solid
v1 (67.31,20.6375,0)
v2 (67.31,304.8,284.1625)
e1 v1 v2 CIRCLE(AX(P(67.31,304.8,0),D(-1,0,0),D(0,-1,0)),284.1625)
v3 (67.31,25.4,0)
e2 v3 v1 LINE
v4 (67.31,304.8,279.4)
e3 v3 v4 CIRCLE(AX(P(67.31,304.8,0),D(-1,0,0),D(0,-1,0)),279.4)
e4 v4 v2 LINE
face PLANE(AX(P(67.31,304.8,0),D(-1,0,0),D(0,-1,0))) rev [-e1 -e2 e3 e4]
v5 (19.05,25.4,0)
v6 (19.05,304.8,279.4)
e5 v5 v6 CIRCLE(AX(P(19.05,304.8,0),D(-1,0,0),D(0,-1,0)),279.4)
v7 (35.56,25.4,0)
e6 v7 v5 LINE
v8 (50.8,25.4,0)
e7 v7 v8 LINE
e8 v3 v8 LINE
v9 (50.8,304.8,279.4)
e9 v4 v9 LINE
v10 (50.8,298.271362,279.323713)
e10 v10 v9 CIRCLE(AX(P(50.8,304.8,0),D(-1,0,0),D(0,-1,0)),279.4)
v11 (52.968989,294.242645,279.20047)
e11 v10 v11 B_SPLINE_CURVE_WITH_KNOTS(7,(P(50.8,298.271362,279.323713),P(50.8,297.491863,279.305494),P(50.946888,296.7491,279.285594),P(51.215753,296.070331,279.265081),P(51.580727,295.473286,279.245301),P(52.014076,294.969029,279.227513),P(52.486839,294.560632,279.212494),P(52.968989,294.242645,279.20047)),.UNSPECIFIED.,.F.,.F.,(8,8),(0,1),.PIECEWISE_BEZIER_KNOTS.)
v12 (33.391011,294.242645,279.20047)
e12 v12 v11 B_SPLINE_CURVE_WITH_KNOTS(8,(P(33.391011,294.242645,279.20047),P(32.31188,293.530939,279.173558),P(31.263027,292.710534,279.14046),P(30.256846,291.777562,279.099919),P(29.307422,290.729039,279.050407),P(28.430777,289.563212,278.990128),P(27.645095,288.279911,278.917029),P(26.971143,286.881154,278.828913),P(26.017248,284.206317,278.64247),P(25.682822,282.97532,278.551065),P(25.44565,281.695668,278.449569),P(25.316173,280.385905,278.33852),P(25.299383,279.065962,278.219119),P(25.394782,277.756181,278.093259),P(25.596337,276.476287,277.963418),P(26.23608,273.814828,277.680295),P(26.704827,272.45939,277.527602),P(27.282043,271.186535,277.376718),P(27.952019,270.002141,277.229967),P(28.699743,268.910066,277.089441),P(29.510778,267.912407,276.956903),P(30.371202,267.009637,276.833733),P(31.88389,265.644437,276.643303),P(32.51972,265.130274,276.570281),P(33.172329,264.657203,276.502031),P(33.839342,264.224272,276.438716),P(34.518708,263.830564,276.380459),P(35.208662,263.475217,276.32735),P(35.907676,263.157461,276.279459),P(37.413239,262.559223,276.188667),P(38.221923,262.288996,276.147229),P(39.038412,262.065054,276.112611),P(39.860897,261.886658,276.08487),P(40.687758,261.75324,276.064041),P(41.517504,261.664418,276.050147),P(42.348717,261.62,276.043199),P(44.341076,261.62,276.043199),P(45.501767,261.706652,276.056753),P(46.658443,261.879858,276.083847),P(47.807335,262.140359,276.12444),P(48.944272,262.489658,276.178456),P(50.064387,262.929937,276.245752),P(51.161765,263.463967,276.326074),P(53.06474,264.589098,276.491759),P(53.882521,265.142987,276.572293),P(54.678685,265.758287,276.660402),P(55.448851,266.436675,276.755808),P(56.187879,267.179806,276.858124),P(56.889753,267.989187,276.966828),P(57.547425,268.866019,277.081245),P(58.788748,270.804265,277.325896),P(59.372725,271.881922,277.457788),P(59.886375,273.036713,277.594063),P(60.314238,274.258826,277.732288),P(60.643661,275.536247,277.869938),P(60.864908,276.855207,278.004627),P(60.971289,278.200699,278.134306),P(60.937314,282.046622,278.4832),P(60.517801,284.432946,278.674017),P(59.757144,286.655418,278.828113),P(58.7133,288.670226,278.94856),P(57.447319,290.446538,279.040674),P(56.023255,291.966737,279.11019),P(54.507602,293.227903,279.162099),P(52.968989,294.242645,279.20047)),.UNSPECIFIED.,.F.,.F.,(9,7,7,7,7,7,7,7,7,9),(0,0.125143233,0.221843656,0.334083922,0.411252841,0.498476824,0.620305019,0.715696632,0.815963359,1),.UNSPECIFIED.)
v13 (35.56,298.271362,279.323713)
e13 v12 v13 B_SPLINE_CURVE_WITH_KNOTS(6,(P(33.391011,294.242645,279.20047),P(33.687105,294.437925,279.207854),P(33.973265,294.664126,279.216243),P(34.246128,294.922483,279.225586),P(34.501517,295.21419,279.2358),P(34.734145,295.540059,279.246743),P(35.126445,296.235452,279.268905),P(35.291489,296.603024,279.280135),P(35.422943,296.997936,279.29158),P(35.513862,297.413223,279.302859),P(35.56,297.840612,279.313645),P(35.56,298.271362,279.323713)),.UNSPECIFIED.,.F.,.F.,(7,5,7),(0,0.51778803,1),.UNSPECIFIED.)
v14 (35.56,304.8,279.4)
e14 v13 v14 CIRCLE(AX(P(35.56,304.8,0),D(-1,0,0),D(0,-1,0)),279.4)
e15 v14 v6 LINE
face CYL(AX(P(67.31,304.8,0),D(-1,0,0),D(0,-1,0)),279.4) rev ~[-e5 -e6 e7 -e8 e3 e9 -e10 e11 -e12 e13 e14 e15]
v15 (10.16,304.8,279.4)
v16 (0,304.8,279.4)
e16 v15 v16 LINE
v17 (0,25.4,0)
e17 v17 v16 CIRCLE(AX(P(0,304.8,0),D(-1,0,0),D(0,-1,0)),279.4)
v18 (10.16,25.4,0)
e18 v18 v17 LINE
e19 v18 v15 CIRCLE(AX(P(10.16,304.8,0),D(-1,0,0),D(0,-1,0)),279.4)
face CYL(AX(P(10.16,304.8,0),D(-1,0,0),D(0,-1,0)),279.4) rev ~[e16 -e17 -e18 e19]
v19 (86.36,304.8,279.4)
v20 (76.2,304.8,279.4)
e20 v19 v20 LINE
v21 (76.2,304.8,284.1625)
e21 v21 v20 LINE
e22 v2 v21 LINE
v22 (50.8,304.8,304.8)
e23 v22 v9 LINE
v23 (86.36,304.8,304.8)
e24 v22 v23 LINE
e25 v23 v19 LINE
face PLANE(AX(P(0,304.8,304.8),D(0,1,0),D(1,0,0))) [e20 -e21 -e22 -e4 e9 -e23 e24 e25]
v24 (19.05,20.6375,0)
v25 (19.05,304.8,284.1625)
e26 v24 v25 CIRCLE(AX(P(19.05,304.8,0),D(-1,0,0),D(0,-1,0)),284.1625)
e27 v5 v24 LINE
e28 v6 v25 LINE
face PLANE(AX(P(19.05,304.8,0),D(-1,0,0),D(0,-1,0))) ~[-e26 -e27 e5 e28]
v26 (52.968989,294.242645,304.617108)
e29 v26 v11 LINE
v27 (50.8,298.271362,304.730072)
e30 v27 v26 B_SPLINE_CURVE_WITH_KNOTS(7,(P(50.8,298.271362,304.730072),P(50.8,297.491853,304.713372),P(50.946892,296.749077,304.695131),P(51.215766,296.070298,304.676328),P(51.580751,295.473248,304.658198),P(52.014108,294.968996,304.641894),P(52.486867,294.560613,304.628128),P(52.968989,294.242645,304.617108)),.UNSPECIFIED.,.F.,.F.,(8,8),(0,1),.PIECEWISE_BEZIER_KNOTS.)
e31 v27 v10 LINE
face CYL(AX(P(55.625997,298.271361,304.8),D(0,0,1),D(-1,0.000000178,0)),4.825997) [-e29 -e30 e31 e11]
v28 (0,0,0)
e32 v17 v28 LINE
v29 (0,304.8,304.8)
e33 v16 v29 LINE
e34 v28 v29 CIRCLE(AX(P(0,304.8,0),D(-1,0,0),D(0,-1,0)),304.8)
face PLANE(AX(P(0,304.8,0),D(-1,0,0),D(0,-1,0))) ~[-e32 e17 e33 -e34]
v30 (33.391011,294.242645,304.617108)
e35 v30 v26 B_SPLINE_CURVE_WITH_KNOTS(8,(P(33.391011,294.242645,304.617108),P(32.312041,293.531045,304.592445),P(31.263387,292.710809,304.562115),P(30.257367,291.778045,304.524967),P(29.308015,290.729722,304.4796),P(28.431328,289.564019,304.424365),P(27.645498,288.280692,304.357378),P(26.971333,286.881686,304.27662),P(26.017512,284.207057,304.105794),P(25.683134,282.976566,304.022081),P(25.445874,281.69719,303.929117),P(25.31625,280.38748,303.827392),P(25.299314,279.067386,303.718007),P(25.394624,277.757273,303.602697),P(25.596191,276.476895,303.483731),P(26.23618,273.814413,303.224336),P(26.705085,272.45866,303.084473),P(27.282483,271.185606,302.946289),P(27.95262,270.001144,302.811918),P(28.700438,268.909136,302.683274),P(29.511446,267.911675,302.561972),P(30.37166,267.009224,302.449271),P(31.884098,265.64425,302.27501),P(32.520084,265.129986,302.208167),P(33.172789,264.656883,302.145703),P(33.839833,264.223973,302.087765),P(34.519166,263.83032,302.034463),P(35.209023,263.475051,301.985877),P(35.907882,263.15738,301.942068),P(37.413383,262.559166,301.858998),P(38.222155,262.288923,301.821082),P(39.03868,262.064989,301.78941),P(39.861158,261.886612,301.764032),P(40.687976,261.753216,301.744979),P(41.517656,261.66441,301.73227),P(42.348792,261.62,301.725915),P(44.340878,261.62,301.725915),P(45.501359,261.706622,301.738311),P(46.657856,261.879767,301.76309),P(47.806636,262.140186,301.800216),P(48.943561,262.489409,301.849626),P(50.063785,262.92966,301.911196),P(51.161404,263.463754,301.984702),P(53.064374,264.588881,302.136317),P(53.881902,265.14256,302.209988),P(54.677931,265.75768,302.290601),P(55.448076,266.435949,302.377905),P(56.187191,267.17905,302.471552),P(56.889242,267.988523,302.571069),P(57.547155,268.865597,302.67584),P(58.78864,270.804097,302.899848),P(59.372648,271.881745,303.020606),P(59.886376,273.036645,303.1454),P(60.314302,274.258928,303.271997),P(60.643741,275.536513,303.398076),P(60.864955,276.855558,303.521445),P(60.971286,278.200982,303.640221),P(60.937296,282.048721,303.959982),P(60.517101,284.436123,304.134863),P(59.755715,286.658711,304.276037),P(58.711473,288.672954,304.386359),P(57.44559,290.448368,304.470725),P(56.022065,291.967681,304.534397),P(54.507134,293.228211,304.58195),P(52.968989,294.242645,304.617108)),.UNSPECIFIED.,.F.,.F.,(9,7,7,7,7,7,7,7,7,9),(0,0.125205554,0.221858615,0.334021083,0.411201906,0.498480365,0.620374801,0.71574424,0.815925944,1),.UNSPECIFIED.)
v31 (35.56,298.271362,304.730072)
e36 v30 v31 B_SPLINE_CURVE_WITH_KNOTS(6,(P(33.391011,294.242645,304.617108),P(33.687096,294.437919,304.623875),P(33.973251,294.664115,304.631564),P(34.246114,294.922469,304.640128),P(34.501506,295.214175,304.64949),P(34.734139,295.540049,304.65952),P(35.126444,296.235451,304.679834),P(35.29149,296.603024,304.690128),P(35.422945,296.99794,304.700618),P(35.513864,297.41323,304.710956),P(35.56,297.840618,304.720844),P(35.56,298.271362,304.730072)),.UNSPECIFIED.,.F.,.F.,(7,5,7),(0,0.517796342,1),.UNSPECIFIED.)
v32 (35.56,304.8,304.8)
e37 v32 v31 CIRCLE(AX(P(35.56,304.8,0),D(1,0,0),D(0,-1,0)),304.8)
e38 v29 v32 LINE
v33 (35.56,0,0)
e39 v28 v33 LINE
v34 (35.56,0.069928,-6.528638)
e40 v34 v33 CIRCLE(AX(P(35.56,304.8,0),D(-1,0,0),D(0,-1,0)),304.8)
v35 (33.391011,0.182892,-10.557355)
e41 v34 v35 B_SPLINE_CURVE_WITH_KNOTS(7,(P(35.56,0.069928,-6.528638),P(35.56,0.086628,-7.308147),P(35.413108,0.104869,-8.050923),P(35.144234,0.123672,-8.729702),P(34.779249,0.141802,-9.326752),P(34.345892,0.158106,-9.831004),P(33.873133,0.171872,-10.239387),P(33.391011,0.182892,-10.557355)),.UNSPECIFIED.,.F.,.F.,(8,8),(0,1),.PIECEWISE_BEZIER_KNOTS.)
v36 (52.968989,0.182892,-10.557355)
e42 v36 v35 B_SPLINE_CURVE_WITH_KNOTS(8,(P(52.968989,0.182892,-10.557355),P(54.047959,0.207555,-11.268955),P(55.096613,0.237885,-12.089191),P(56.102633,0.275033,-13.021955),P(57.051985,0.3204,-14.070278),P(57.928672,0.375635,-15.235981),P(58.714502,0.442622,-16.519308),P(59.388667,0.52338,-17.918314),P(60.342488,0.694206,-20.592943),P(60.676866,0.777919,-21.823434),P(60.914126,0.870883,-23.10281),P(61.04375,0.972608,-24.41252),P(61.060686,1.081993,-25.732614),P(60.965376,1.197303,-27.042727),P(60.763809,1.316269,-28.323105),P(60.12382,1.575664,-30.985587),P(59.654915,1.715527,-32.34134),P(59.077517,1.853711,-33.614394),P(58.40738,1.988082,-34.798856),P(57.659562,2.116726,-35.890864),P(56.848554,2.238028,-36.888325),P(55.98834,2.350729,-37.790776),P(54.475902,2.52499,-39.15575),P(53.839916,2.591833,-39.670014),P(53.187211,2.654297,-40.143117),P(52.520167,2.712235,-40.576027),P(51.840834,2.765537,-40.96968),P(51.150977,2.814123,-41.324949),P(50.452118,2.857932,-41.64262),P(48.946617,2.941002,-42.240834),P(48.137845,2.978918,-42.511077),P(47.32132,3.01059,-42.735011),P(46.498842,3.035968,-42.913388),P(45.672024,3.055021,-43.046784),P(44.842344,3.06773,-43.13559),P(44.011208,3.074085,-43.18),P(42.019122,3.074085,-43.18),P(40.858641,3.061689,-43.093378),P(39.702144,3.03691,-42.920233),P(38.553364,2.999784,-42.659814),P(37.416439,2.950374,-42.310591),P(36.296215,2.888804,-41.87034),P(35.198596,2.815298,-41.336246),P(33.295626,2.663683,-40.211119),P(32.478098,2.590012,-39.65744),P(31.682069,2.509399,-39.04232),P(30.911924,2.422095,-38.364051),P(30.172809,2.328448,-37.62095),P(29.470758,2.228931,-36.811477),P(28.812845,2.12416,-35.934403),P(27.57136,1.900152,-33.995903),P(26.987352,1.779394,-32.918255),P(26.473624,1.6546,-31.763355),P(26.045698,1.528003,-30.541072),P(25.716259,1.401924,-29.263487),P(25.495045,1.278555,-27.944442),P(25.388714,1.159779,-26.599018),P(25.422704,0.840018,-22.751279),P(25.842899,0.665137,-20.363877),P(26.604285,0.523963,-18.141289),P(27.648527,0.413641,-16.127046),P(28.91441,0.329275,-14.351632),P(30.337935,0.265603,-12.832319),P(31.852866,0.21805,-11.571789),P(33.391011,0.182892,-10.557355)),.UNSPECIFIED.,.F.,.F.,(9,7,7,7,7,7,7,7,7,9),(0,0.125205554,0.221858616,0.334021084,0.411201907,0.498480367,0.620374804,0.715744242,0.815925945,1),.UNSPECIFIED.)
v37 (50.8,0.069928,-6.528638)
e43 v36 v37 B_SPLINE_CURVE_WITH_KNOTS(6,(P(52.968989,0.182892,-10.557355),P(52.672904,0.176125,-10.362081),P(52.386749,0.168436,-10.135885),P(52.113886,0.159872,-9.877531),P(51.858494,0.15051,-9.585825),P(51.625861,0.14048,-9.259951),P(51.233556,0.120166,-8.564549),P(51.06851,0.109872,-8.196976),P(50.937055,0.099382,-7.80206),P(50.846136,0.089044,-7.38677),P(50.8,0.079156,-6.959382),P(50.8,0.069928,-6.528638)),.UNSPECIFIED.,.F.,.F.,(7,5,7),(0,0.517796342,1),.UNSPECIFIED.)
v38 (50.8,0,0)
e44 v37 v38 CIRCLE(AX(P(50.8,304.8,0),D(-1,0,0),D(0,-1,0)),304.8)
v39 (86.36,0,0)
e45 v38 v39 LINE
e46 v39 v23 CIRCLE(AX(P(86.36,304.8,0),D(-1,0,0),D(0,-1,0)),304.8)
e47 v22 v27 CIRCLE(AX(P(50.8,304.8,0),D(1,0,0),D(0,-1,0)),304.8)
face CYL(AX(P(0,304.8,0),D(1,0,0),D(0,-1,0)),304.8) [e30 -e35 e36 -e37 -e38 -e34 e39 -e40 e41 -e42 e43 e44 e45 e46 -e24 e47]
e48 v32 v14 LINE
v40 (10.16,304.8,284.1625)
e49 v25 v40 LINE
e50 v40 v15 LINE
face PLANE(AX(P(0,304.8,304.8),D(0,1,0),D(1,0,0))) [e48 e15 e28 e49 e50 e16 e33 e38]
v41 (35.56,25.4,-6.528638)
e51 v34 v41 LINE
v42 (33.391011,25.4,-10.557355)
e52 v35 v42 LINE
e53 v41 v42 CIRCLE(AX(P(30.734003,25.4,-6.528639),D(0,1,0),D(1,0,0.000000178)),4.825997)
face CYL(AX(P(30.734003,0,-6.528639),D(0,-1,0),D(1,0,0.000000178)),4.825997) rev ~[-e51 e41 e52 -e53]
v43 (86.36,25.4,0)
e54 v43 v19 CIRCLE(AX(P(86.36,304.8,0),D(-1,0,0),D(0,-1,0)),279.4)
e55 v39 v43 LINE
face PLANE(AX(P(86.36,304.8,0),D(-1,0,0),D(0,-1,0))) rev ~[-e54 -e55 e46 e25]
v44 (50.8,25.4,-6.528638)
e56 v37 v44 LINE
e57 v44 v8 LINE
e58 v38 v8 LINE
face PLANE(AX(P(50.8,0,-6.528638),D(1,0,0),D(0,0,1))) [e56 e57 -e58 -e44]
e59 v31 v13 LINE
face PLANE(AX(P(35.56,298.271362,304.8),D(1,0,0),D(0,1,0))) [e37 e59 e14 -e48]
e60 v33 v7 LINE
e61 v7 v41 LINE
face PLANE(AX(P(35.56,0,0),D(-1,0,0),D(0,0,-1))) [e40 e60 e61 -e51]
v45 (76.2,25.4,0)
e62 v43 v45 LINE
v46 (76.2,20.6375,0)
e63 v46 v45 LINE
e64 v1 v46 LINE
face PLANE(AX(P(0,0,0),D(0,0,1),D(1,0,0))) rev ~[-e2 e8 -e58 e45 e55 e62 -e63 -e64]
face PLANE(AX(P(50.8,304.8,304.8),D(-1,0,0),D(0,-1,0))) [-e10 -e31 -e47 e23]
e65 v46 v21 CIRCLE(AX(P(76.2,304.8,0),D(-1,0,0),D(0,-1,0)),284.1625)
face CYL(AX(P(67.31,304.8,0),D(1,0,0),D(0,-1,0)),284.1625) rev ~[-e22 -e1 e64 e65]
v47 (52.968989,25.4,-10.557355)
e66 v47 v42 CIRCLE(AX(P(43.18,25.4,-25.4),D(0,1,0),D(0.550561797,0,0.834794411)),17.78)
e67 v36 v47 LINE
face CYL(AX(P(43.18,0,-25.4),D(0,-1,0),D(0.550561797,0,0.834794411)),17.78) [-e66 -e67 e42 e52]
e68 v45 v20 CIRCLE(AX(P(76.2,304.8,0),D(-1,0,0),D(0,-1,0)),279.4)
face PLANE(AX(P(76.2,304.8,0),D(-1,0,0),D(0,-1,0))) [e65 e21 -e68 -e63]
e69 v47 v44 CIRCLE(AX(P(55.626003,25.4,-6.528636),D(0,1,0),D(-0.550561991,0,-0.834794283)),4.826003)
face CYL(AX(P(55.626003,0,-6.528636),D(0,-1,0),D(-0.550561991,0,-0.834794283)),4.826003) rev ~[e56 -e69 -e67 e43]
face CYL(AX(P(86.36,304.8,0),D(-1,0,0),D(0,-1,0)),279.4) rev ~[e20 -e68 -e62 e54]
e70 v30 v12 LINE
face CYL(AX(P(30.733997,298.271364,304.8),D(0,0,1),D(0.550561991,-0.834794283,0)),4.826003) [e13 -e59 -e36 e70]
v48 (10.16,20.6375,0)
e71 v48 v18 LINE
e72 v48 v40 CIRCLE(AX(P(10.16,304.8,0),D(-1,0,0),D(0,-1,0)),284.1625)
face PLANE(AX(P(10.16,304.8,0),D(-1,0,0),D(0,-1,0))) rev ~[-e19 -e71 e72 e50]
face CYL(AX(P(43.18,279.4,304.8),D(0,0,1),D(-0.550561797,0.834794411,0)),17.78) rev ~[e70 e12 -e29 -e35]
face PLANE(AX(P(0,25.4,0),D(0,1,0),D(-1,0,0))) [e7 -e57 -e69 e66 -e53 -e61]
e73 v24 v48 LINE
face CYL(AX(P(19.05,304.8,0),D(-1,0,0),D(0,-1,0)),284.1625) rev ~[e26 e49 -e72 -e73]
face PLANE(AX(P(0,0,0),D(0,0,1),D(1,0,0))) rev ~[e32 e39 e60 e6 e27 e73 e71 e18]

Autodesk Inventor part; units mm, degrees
ref_plane "YZ Plane" through (0, 0, 0) normal (1, 0, 0) x (0, 1, 0)
ref_plane "XZ Plane" through (0, 0, 0) normal (0, 1, 0) x (-1, 0, 0)
ref_plane "XY Plane" through (0, 0, 0) normal (0, 0, 1) x (1, 0, 0)
sketch "Track sketch" plane through (0, 0, 0) normal (0, 0, 1) x (1, 0, 0)
  line L0 (0, 0) -> (86.36, 0)
  line L1 (86.36, 0) -> (86.36, 25.4)
  line L2 (0, 25.4) -> (0, 0)
  line L3 (19.05, 25.4) -> (19.05, 20.6375)
  line L4 (19.05, 20.6375) -> (10.16, 20.6375)
  line L5 (10.16, 20.6375) -> (10.16, 25.4)
  line L6 (43.18, 25.4) -> (43.18, 0) construction
  line L7 (67.31, 25.4) -> (67.31, 20.6375)
  line L8 (67.31, 20.6375) -> (76.2, 20.6375)
  line L9 (76.2, 20.6375) -> (76.2, 25.4)
  line L10 (10.16, 25.4) -> (0, 25.4)
  line L11 (86.36, 25.4) -> (76.2, 25.4)
  line L12 (67.31, 25.4) -> (19.05, 25.4)
  line L13 (0, 0) -> (0, 304.8) construction
  line L14 (0, 304.8) -> (86.36, 304.8) construction
  line L15 (0, 0) -> (0, -25.4)
  line L16 (0, -25.4) -> (86.36, -25.4)
  line L17 (86.36, -25.4) -> (86.36, 0)
  dimension "d0" = 86.36
  dimension "d1" = 25.4
  dimension "d2" = 19.05
  dimension "d3" = 10.16
  dimension "d6" = 4.7625
  dimension "d23" = 304.8
  dimension "d47" = 25.4
revolve "Revolution1" add sketch "Track sketch" angle 90 about axis through (0, 304.8, 0) along (-1, 0, 0) contours L2 L10 L5 L4 L3 L12 L7 L8 L9 L11 L1 L0
sketch "Sketch3" plane through (0, 0, 0) normal (0, 1, 0) x (-1, 0, 0)
  line L0 (-19.50225, 0) -> (-66.85775, 0)
  line L1 (-43.18, 304.8) -> (-43.18, 0) construction
  line L2 (-43.18, 0) -> (-43.18, -37.562444) construction
  arc A0 (-52.968989, -10.557355) -> (-33.391011, -10.557355) centre (-43.18, -25.4) ccw
  line L3 (-50.8, 0) -> (-35.56, 0)
  line L4 (-35.56, 0) -> (-35.56, -6.528638)
  line L5 (-35.56, -9.335629) -> (-50.8, -9.335629) construction
  line L6 (-50.8, -6.528638) -> (-50.8, 0)
  arc A1 (-52.968989, -10.557355) -> (-50.8, -6.528638) centre (-55.626, -6.528638) ccw
  arc A2 (-35.56, -6.528638) -> (-33.391011, -10.557355) centre (-30.734, -6.528638) ccw
  line L7 (0, 0) -> (-86.36, 0)
  line L8 (-86.36, 0) -> (-86.36, 304.8)
  line L9 (0, 304.8) -> (-86.36, 304.8)
  line L10 (0, 0) -> (0, 304.8)
  line L11 (0, 0) -> (-86.36, 0)
  line L12 (0, 304.8) -> (-86.36, 304.8) construction
  line L13 (-43.18, 304.8) -> (-43.18, 65.498651) construction
  point P0 (-43.18, 279.4)
  dimension "d25" = 279.4
  dimension "d26" = 35.56
  dimension "d27" = 25.4
  dimension "d28" = 15.24
  dimension "d29" = 4.826
  dimension "d32" = 86.36
  dimension "d33" = 43.18
  dimension "d34" = 43.18
  dimension "d35" = 25.4
extrude "Extrusion4" add sketch "Sketch3" along normal blind 25.4 contours L4 A2 A0 A1 L6 L0
ref_plane "Work Plane1" through (0, 304.8, 304.8) normal (0, 0, 1) x (1, 0, 0)
sketch "Sketch4" plane through (0, 304.8, 304.8) normal (0, 0, 1) x (1, 0, 0)
  line L0 (0, -304.8) -> (35.56, -304.8)
  line L1 (35.56, -304.8) -> (50.8, -304.8)
  line L2 (50.8, -304.8) -> (86.36, -304.8)
  line L3 (86.36, -304.8) -> (86.36, 0)
  line L4 (0, 0) -> (86.36, 0)
  line L5 (0, -304.8) -> (0, 0)
  line L6 (67.31, 0) -> (19.05, 0)
  line L7 (43.18, 304.8) -> (43.18, 0) construction
  line L8 (43.18, 0) -> (43.18, -37.562444) construction
  arc A0 (33.391011, -10.557355) -> (52.968989, -10.557355) centre (43.18, -25.4) ccw
  line L9 (35.56, 0) -> (50.8, 0)
  line L10 (50.8, 0) -> (50.8, -6.528638)
  line L11 (50.8, -9.335629) -> (35.56, -9.335629) construction
  line L12 (35.56, -6.528638) -> (35.56, 0)
  arc A1 (33.391011, -10.557355) -> (35.56, -6.528638) centre (30.734, -6.528638) ccw
  arc A2 (50.8, -6.528638) -> (52.968989, -10.557355) centre (55.626, -6.528638) ccw
  point P0 (43.18, 279.4)
  dimension "d38" = 279.4
  dimension "d39" = 35.56
  dimension "d40" = 25.4
  dimension "d41" = 15.24
  dimension "d42" = 4.826
  dimension "d43" = 43.18
  dimension "d44" = 25.4
extrude "Extrusion5" cut sketch "Sketch4" against normal blind 50.8 contours L4 L10 A2 A0 A1 L12
sketch "Track sketch outline for Revolution2" plane through (0, 0, 0) normal (0, 0, 1) x (1, 0, 0)
  line L0 (86.36, 0) -> (0, 0)
  line L1 (86.36, -25.4) -> (86.36, 0)
  line L2 (0, -25.4) -> (86.36, -25.4)
  line L3 (0, 0) -> (0, -25.4)
revolve "Revolution2" cut sketch "Track sketch outline for Revolution2" angle 360 about axis through (0, 304.8, 0) along (1, 0, 0)
properties part number "Caufield_Straight_Track"
